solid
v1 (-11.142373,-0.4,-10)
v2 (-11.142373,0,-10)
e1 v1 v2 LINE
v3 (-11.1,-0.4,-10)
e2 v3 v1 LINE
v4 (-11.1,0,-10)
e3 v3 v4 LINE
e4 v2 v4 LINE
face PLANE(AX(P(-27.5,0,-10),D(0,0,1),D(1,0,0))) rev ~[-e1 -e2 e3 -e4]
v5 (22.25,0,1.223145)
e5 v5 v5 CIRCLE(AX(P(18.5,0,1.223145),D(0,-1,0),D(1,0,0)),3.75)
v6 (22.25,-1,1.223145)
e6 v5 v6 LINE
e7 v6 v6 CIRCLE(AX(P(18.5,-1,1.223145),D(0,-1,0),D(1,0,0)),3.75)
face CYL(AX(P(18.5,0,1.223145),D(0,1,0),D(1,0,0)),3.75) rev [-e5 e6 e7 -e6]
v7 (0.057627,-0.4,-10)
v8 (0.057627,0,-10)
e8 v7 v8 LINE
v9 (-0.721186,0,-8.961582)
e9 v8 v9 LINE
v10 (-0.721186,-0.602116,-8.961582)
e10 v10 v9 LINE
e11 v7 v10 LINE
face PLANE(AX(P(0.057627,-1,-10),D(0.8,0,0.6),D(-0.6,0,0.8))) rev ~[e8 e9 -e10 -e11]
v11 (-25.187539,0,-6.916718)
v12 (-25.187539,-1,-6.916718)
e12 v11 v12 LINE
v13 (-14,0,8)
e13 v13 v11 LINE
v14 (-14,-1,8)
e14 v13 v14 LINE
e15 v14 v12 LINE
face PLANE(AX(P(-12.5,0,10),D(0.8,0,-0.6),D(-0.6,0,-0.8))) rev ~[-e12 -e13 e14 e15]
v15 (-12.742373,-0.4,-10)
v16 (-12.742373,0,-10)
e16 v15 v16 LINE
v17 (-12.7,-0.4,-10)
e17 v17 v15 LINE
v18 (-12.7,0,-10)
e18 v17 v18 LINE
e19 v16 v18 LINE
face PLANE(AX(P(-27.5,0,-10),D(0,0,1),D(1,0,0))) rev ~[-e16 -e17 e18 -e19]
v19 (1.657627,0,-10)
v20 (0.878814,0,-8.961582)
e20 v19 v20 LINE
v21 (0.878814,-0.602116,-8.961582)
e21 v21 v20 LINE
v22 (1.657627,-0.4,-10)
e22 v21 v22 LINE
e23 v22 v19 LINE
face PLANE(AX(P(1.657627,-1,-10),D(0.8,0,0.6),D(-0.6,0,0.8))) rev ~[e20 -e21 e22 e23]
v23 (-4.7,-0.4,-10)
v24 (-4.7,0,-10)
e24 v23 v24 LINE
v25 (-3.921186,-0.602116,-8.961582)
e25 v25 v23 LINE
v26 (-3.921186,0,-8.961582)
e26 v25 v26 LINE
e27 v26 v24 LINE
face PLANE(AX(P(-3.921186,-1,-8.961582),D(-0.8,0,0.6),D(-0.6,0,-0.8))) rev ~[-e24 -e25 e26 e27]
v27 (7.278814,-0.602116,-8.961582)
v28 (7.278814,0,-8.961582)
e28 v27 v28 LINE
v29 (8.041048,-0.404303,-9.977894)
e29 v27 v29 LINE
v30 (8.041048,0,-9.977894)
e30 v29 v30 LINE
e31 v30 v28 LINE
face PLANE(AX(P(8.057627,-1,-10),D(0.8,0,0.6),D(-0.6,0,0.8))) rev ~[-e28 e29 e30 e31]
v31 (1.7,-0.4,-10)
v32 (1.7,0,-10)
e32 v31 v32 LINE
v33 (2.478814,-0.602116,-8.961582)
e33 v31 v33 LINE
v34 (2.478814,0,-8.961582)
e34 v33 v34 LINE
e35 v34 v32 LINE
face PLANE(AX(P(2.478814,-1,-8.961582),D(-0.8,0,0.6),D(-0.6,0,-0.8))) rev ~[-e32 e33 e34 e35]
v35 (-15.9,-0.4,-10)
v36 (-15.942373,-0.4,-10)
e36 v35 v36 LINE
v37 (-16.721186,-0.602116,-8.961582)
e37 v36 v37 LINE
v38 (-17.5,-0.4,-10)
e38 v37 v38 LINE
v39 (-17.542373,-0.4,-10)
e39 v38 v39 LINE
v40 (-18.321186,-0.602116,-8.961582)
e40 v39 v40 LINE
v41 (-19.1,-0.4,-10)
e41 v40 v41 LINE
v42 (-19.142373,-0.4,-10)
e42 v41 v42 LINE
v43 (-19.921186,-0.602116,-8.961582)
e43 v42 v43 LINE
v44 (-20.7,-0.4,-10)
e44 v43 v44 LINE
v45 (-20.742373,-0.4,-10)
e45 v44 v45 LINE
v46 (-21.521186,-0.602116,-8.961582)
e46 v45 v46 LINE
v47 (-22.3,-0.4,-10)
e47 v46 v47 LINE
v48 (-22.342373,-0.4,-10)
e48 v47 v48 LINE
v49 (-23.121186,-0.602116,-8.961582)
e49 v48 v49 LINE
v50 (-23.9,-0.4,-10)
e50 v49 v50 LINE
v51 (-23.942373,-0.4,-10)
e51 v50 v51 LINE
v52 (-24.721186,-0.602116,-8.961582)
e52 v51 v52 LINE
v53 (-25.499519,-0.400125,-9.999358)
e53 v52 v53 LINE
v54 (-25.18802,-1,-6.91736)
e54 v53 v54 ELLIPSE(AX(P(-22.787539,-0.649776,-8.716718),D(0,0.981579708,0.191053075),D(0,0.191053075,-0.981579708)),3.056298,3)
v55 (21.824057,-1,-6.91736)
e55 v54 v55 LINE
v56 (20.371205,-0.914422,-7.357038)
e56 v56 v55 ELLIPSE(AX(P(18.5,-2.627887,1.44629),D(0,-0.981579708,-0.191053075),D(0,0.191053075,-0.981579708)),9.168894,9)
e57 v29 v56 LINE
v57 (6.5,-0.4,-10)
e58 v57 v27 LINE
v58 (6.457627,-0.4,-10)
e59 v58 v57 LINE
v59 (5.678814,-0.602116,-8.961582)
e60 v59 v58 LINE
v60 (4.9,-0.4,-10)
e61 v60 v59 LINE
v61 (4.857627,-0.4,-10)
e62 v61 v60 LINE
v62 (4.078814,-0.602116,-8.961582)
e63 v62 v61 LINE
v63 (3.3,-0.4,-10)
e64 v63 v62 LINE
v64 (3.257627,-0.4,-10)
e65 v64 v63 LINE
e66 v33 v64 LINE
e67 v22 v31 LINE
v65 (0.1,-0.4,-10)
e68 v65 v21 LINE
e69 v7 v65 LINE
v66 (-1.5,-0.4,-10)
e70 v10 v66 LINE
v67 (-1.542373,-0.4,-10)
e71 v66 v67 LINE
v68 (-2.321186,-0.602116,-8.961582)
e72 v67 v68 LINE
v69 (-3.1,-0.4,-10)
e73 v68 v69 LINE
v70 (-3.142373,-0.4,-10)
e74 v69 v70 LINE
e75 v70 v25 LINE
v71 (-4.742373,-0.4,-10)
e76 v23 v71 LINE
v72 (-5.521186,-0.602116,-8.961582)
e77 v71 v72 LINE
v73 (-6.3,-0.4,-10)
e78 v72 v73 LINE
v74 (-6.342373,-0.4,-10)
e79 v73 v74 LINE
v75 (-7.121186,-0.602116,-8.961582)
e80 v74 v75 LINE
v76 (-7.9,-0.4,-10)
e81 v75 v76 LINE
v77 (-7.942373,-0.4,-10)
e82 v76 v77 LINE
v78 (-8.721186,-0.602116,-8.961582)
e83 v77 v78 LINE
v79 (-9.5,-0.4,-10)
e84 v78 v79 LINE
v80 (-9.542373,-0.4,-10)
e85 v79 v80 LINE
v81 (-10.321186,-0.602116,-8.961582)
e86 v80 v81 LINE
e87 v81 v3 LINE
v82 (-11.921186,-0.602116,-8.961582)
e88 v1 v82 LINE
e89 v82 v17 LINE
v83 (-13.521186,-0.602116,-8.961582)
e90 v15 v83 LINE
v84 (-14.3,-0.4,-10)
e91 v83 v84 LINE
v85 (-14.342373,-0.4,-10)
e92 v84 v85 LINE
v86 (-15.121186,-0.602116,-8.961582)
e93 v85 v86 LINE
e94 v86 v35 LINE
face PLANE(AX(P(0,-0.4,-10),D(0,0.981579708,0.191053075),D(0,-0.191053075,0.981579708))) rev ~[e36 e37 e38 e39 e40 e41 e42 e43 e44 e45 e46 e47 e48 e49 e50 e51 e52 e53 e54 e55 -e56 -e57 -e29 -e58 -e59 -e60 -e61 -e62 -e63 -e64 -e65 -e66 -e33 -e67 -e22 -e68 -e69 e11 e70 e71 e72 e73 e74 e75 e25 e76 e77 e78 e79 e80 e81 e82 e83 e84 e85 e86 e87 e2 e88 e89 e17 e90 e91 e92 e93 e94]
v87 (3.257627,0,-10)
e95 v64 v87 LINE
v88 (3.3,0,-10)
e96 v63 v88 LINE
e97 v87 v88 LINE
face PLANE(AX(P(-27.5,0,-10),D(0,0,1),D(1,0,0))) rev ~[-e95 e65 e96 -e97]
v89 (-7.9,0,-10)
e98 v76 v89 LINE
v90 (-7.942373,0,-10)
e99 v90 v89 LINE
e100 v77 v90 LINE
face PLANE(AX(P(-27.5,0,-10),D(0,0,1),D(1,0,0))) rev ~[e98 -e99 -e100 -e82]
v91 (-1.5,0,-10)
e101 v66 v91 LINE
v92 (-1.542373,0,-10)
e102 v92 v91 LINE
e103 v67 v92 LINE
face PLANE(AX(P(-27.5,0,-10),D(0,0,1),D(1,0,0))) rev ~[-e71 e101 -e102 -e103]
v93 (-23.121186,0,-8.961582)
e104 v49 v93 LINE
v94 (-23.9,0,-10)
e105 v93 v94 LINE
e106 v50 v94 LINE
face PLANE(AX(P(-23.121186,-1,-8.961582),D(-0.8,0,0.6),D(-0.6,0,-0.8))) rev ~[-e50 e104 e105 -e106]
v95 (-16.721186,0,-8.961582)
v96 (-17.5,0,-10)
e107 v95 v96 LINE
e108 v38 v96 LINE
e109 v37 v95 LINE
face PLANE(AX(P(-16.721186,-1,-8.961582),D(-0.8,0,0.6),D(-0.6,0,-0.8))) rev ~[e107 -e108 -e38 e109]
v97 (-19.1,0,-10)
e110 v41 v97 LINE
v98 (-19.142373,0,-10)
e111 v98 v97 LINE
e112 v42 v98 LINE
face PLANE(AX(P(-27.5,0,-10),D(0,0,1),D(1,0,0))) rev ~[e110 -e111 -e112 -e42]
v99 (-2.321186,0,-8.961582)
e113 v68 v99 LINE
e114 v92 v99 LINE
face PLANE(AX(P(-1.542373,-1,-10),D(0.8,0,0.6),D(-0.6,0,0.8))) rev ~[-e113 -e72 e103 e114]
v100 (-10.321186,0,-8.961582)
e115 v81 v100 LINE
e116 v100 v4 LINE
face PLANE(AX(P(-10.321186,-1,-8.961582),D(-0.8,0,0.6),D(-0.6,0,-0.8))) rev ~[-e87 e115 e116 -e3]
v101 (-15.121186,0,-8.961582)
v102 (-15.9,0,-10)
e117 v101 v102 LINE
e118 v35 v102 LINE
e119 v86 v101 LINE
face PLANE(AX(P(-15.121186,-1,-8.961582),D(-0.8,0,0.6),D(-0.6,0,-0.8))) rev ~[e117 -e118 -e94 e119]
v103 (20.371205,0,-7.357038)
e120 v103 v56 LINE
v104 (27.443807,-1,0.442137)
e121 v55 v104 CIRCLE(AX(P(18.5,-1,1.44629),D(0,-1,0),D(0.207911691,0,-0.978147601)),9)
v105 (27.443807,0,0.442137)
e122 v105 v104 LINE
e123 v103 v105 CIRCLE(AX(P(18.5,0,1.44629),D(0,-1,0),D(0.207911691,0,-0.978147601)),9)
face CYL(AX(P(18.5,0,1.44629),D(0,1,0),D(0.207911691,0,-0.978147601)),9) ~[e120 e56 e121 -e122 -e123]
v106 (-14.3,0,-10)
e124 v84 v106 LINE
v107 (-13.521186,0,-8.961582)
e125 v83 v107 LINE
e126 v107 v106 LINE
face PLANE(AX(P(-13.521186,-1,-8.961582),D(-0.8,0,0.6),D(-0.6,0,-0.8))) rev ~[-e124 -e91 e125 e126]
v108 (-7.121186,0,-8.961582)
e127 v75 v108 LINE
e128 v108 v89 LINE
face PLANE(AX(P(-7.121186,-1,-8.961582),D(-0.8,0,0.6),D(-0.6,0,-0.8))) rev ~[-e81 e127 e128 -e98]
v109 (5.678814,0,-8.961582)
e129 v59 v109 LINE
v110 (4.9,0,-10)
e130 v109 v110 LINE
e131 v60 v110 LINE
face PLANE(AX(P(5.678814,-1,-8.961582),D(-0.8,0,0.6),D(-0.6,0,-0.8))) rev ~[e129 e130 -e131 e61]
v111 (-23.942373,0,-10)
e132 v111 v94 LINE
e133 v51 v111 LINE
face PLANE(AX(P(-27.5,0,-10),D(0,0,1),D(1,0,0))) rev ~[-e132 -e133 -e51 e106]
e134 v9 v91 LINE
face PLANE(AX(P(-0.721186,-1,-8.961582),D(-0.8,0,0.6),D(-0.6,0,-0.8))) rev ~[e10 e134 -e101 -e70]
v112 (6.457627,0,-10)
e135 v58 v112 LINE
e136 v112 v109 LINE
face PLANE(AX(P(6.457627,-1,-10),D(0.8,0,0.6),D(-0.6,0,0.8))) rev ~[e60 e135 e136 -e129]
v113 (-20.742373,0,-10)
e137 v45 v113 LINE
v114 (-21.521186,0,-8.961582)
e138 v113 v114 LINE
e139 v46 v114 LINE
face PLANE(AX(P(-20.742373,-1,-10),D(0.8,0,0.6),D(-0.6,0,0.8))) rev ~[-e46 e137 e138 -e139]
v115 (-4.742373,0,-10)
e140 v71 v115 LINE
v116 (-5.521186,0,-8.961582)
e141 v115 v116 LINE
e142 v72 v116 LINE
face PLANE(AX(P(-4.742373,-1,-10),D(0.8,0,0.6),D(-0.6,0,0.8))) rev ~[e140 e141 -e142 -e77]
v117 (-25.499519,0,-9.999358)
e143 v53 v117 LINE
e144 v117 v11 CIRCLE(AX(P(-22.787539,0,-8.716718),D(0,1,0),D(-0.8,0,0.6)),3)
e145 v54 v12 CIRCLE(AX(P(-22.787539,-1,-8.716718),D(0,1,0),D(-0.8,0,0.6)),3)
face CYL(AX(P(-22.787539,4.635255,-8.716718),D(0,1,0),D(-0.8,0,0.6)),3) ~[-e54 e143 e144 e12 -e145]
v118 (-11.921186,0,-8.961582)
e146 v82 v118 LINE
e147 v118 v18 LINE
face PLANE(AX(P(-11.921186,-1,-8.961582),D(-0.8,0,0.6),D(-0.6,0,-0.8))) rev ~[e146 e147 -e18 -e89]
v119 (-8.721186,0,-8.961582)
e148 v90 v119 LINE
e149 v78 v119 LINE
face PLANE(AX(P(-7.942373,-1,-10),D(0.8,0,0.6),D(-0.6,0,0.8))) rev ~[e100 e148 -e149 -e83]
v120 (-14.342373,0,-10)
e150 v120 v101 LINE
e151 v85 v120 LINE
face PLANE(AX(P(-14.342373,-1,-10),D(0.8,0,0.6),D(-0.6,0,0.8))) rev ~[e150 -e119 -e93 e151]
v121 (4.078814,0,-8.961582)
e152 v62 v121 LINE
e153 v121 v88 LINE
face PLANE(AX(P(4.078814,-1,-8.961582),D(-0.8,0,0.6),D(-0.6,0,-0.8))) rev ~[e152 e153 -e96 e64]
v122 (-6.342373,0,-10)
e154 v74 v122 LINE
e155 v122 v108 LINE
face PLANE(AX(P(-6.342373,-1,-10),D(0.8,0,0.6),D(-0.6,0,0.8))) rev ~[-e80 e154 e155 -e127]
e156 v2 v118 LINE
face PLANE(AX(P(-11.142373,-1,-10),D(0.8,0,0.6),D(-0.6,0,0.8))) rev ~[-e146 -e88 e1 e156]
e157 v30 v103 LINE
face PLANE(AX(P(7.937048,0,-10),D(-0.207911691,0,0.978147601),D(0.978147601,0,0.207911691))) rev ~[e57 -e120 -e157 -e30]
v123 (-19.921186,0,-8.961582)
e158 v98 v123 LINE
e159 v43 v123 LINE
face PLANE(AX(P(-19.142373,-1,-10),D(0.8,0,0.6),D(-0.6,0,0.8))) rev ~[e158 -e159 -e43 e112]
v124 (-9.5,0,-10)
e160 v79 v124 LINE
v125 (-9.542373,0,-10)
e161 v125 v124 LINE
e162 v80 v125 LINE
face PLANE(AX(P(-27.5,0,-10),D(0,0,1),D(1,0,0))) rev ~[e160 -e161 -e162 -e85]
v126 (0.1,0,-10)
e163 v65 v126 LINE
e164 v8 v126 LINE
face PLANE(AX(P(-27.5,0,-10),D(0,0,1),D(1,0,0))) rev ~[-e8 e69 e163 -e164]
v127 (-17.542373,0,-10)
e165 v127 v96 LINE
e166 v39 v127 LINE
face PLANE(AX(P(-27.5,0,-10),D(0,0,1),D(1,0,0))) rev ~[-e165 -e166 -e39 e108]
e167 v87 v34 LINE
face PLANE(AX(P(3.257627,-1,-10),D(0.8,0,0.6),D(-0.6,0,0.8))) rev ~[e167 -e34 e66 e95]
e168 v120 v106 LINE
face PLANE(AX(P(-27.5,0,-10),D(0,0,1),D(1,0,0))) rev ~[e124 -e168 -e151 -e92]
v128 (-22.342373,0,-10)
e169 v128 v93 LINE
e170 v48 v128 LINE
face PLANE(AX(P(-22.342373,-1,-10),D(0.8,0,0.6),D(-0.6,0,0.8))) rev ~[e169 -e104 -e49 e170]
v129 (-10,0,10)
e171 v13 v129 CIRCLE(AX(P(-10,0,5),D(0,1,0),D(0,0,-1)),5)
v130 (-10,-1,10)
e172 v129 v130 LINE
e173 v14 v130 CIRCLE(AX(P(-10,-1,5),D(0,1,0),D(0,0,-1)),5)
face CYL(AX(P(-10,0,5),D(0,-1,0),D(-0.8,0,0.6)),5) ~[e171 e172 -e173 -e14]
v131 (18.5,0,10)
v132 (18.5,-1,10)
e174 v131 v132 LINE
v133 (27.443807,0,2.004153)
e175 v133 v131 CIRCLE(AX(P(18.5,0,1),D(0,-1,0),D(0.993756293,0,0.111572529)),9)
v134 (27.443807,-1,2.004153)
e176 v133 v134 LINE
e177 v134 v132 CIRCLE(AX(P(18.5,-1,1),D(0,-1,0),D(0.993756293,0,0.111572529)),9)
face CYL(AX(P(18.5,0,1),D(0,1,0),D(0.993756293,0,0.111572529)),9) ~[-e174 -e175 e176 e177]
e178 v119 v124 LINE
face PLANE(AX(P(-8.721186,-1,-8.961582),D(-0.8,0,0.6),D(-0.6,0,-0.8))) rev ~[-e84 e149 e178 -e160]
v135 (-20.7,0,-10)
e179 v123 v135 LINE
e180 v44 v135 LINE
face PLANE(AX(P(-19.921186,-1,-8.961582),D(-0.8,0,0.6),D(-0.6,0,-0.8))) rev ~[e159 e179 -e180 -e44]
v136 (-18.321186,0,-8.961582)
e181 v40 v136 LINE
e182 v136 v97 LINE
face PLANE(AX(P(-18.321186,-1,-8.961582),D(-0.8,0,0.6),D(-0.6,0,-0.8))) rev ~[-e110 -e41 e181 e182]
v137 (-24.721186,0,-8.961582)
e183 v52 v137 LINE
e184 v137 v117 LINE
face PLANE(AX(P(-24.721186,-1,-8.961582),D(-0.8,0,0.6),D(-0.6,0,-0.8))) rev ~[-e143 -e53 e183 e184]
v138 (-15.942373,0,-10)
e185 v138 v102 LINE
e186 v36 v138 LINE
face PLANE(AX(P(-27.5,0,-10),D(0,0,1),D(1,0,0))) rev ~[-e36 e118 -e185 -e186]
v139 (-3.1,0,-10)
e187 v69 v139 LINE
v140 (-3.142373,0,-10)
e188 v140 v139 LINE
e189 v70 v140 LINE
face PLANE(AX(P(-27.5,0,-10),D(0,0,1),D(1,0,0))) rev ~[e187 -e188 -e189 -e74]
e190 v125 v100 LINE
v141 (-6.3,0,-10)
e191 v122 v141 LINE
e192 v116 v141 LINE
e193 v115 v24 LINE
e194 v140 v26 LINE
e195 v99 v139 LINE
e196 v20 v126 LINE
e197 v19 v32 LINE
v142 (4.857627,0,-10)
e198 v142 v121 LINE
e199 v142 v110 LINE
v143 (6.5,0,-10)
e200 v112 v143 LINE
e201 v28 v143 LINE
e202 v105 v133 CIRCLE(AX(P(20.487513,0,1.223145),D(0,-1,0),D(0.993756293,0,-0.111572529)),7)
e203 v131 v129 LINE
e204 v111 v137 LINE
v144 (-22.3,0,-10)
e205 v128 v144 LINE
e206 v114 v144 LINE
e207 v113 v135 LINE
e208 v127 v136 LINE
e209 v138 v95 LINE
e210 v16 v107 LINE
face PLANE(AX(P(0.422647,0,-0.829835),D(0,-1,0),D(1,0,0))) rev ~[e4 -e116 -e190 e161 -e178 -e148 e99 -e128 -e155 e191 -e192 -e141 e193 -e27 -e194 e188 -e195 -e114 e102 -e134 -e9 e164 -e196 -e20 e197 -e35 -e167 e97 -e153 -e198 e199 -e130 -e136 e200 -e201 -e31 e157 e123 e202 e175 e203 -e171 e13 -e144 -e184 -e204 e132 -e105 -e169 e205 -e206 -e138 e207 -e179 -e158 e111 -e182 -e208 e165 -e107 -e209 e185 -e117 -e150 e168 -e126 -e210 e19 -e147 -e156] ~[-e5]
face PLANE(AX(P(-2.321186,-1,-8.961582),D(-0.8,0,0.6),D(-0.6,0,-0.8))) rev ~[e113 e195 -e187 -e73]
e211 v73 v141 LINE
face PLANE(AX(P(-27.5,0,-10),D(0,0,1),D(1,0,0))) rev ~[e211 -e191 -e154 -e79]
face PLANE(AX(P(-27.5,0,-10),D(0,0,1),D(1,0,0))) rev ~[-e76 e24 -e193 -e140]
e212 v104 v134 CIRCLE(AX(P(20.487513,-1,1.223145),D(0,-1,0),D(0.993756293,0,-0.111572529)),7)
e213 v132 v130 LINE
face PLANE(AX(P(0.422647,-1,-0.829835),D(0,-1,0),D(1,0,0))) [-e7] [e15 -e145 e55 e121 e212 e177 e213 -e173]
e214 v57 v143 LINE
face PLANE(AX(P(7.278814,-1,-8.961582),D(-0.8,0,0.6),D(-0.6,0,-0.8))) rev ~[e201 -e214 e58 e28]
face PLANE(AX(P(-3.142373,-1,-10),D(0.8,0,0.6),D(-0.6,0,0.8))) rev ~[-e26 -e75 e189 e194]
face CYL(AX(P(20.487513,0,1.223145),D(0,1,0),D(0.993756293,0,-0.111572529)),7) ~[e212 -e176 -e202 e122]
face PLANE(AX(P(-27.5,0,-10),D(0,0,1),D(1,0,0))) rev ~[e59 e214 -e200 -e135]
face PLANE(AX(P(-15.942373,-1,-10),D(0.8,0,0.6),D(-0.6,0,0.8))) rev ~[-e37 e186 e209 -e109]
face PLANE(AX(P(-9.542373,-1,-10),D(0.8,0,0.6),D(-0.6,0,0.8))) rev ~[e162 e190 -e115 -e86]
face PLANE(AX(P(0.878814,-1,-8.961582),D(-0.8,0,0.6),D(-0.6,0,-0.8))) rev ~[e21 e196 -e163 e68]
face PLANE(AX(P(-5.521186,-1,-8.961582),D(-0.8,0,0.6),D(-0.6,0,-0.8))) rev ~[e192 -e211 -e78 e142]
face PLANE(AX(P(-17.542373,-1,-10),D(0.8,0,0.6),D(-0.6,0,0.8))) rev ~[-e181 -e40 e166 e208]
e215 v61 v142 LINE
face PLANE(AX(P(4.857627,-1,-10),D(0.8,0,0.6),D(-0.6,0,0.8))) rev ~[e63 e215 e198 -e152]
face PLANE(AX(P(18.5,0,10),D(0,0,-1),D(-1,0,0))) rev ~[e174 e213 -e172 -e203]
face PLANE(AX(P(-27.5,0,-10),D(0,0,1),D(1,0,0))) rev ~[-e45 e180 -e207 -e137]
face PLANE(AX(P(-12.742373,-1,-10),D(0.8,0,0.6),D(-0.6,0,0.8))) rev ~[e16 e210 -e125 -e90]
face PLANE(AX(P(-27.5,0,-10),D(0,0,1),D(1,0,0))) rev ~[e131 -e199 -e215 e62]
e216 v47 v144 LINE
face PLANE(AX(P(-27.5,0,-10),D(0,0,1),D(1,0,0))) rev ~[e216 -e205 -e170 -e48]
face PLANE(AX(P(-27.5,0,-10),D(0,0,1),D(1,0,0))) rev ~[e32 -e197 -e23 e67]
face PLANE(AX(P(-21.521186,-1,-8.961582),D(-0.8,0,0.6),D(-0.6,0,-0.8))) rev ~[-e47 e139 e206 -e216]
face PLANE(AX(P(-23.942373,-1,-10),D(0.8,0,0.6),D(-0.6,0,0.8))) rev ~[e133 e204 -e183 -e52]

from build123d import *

# Parameters (mm, degrees)
F0_R           = 3.75
F1_DEPTH       = 1
F2_R           = 5
F3_R           = 1
F5_DEPTH       = 25
F7_DEPTH       = 25
F8_T1_DEPTH    = 10.2705098312
F10_DEPTH      = 30
F10_DEPTH_BACK = 25


# Not quite as in the source:
# - a fillet or chamfer that OpenCascade refuses, or shapes differently, is made with other operations: its cross-section is extruded or revolved along the edge and cut away or added


with BuildPart() as f1:
    # F0 (on Front) → F1 (new body)
    with BuildSketch(Plane.XZ):
        with BuildLine():
            Line((-27.5, -10), (7.9370479853, -10))
            Line((7.9370479853, -10), (20.3712052174, -7.3570382915))
            ThreePointArc((20.3712052174, -7.3570382915), (25.1669262461, -4.5995427), (27.4438066413, 0.4421373561))
            ThreePointArc((27.4438066413, 0.4421373561), (27.487512587, 1.2231450576), (27.4438066413, 2.004152759))
            ThreePointArc((27.4438066413, 2.004152759), (24.4984425132, 7.7095966656), (18.5, 10))
            Line((18.5, 10), (-12.5, 10))
            Line((-12.5, 10), (-27.5, -10))
        make_face()
        with Locations((18.5, 1.2231450576)):
            Circle(F0_R, mode=Mode.SUBTRACT)
    extrude(amount=F1_DEPTH)

    # F2
    f2_edges = [f1.edges().sort_by_distance(p)[0] for p in [
        (-12.5, -0.5, 10),
    ]]
    fillet(f2_edges, radius=F2_R)

    # F3
    f3_edges = [f1.edges().sort_by_distance(p)[0] for p in [
        (-27.5, -0.5, -10),
    ]]
    fillet(f3_edges, radius=F3_R)

    # F4 (on face) → F5 (cut)
    with BuildSketch(Plane.XZ.offset(1)):
        Polygon((-24.7211863589, -8.9615818119), (-25.5, -10), (-25.5, -14.0343736857), (7.9370479853, -14.0343736857), (8.0576272821, -10), (7.2788136411, -8.9615818119), (6.5, -10), (6.4576272821, -10), (5.6788136411, -8.9615818119), (4.9, -10), (4.8576272821, -10), (4.0788136411, -8.9615818119), (3.3, -10), (3.2576272821, -10), (2.4788136411, -8.9615818119), (1.7, -10), (1.6576272821, -10), (0.8788136411, -8.9615818119), (0.1, -10), (0.0576272821, -10), (-0.7211863589, -8.9615818119), (-1.5, -10), (-1.5423727179, -10), (-2.3211863589, -8.9615818119), (-3.1, -10), (-3.1423727179, -10), (-3.9211863589, -8.9615818119), (-4.7, -10), (-4.7423727179, -10), (-5.5211863589, -8.9615818119), (-6.3, -10), (-6.3423727179, -10), (-7.1211863589, -8.9615818119), (-7.9, -10), (-7.9423727179, -10), (-8.7211863589, -8.9615818119), (-9.5, -10), (-9.5423727179, -10), (-10.3211863589, -8.9615818119), (-11.1, -10), (-11.1423727179, -10), (-11.9211863589, -8.9615818119), (-12.7, -10), (-12.7423727179, -10), (-13.5211863589, -8.9615818119), (-14.3, -10), (-14.3423727179, -10), (-15.1211863589, -8.9615818119), (-15.9, -10), (-15.9423727179, -10), (-16.7211863589, -8.9615818119), (-17.5, -10), (-17.5423727179, -10), (-18.3211863589, -8.9615818119), (-19.1, -10), (-19.1423727179, -10), (-19.9211863589, -8.9615818119), (-20.7, -10), (-20.7423727179, -10), (-21.5211863589, -8.9615818119), (-22.3, -10), (-22.3423727179, -10), (-23.1211863589, -8.9615818119), (-23.9, -10), (-23.9423727179, -10), align=None)
    extrude(amount=-F5_DEPTH, mode=Mode.SUBTRACT)

    # F6 (on face) → F7 (cut)
    with BuildSketch(Plane.XZ.offset(1)):
        Polygon((-26.6561899334, -14.2840119079), (-25.5, -10), (-26.3, -8.4), (-30.4410159588, -7.8742252663), align=None)
    extrude(amount=-F7_DEPTH, mode=Mode.SUBTRACT)

    # F8: fillet of radius 3 on 1 edges, made by hand

    # F8_s2 → F8_t1 (cut)
    with BuildSketch(Plane.XZ.offset(-4.6352549156)):
        with BuildLine():
            ThreePointArc((-25.1875388203, -6.916718427), (-25.7754167621, -8.4473016411), (-25.4708203932, -10.0583592135))
            Line((-25.4708203932, -10.0583592135), (-26.3, -8.4))
            Line((-26.3, -8.4), (-25.1875388203, -6.916718427))
        make_face()
    extrude(amount=F8_T1_DEPTH, mode=Mode.SUBTRACT)

    # F9 (on Right) → F10 (cut, two sides)
    with BuildSketch(Plane.YZ) as f10_sk:
        Polygon((-2.5567745324, -10.8186043799), (-0.4, -10), (-1, -6.9173601342), (-2.5567745324, -6.9173601342), align=None)
    extrude(amount=-F10_DEPTH, mode=Mode.SUBTRACT)
    extrude(f10_sk.sketch, amount=F10_DEPTH_BACK, mode=Mode.SUBTRACT)


solid = f1.part
